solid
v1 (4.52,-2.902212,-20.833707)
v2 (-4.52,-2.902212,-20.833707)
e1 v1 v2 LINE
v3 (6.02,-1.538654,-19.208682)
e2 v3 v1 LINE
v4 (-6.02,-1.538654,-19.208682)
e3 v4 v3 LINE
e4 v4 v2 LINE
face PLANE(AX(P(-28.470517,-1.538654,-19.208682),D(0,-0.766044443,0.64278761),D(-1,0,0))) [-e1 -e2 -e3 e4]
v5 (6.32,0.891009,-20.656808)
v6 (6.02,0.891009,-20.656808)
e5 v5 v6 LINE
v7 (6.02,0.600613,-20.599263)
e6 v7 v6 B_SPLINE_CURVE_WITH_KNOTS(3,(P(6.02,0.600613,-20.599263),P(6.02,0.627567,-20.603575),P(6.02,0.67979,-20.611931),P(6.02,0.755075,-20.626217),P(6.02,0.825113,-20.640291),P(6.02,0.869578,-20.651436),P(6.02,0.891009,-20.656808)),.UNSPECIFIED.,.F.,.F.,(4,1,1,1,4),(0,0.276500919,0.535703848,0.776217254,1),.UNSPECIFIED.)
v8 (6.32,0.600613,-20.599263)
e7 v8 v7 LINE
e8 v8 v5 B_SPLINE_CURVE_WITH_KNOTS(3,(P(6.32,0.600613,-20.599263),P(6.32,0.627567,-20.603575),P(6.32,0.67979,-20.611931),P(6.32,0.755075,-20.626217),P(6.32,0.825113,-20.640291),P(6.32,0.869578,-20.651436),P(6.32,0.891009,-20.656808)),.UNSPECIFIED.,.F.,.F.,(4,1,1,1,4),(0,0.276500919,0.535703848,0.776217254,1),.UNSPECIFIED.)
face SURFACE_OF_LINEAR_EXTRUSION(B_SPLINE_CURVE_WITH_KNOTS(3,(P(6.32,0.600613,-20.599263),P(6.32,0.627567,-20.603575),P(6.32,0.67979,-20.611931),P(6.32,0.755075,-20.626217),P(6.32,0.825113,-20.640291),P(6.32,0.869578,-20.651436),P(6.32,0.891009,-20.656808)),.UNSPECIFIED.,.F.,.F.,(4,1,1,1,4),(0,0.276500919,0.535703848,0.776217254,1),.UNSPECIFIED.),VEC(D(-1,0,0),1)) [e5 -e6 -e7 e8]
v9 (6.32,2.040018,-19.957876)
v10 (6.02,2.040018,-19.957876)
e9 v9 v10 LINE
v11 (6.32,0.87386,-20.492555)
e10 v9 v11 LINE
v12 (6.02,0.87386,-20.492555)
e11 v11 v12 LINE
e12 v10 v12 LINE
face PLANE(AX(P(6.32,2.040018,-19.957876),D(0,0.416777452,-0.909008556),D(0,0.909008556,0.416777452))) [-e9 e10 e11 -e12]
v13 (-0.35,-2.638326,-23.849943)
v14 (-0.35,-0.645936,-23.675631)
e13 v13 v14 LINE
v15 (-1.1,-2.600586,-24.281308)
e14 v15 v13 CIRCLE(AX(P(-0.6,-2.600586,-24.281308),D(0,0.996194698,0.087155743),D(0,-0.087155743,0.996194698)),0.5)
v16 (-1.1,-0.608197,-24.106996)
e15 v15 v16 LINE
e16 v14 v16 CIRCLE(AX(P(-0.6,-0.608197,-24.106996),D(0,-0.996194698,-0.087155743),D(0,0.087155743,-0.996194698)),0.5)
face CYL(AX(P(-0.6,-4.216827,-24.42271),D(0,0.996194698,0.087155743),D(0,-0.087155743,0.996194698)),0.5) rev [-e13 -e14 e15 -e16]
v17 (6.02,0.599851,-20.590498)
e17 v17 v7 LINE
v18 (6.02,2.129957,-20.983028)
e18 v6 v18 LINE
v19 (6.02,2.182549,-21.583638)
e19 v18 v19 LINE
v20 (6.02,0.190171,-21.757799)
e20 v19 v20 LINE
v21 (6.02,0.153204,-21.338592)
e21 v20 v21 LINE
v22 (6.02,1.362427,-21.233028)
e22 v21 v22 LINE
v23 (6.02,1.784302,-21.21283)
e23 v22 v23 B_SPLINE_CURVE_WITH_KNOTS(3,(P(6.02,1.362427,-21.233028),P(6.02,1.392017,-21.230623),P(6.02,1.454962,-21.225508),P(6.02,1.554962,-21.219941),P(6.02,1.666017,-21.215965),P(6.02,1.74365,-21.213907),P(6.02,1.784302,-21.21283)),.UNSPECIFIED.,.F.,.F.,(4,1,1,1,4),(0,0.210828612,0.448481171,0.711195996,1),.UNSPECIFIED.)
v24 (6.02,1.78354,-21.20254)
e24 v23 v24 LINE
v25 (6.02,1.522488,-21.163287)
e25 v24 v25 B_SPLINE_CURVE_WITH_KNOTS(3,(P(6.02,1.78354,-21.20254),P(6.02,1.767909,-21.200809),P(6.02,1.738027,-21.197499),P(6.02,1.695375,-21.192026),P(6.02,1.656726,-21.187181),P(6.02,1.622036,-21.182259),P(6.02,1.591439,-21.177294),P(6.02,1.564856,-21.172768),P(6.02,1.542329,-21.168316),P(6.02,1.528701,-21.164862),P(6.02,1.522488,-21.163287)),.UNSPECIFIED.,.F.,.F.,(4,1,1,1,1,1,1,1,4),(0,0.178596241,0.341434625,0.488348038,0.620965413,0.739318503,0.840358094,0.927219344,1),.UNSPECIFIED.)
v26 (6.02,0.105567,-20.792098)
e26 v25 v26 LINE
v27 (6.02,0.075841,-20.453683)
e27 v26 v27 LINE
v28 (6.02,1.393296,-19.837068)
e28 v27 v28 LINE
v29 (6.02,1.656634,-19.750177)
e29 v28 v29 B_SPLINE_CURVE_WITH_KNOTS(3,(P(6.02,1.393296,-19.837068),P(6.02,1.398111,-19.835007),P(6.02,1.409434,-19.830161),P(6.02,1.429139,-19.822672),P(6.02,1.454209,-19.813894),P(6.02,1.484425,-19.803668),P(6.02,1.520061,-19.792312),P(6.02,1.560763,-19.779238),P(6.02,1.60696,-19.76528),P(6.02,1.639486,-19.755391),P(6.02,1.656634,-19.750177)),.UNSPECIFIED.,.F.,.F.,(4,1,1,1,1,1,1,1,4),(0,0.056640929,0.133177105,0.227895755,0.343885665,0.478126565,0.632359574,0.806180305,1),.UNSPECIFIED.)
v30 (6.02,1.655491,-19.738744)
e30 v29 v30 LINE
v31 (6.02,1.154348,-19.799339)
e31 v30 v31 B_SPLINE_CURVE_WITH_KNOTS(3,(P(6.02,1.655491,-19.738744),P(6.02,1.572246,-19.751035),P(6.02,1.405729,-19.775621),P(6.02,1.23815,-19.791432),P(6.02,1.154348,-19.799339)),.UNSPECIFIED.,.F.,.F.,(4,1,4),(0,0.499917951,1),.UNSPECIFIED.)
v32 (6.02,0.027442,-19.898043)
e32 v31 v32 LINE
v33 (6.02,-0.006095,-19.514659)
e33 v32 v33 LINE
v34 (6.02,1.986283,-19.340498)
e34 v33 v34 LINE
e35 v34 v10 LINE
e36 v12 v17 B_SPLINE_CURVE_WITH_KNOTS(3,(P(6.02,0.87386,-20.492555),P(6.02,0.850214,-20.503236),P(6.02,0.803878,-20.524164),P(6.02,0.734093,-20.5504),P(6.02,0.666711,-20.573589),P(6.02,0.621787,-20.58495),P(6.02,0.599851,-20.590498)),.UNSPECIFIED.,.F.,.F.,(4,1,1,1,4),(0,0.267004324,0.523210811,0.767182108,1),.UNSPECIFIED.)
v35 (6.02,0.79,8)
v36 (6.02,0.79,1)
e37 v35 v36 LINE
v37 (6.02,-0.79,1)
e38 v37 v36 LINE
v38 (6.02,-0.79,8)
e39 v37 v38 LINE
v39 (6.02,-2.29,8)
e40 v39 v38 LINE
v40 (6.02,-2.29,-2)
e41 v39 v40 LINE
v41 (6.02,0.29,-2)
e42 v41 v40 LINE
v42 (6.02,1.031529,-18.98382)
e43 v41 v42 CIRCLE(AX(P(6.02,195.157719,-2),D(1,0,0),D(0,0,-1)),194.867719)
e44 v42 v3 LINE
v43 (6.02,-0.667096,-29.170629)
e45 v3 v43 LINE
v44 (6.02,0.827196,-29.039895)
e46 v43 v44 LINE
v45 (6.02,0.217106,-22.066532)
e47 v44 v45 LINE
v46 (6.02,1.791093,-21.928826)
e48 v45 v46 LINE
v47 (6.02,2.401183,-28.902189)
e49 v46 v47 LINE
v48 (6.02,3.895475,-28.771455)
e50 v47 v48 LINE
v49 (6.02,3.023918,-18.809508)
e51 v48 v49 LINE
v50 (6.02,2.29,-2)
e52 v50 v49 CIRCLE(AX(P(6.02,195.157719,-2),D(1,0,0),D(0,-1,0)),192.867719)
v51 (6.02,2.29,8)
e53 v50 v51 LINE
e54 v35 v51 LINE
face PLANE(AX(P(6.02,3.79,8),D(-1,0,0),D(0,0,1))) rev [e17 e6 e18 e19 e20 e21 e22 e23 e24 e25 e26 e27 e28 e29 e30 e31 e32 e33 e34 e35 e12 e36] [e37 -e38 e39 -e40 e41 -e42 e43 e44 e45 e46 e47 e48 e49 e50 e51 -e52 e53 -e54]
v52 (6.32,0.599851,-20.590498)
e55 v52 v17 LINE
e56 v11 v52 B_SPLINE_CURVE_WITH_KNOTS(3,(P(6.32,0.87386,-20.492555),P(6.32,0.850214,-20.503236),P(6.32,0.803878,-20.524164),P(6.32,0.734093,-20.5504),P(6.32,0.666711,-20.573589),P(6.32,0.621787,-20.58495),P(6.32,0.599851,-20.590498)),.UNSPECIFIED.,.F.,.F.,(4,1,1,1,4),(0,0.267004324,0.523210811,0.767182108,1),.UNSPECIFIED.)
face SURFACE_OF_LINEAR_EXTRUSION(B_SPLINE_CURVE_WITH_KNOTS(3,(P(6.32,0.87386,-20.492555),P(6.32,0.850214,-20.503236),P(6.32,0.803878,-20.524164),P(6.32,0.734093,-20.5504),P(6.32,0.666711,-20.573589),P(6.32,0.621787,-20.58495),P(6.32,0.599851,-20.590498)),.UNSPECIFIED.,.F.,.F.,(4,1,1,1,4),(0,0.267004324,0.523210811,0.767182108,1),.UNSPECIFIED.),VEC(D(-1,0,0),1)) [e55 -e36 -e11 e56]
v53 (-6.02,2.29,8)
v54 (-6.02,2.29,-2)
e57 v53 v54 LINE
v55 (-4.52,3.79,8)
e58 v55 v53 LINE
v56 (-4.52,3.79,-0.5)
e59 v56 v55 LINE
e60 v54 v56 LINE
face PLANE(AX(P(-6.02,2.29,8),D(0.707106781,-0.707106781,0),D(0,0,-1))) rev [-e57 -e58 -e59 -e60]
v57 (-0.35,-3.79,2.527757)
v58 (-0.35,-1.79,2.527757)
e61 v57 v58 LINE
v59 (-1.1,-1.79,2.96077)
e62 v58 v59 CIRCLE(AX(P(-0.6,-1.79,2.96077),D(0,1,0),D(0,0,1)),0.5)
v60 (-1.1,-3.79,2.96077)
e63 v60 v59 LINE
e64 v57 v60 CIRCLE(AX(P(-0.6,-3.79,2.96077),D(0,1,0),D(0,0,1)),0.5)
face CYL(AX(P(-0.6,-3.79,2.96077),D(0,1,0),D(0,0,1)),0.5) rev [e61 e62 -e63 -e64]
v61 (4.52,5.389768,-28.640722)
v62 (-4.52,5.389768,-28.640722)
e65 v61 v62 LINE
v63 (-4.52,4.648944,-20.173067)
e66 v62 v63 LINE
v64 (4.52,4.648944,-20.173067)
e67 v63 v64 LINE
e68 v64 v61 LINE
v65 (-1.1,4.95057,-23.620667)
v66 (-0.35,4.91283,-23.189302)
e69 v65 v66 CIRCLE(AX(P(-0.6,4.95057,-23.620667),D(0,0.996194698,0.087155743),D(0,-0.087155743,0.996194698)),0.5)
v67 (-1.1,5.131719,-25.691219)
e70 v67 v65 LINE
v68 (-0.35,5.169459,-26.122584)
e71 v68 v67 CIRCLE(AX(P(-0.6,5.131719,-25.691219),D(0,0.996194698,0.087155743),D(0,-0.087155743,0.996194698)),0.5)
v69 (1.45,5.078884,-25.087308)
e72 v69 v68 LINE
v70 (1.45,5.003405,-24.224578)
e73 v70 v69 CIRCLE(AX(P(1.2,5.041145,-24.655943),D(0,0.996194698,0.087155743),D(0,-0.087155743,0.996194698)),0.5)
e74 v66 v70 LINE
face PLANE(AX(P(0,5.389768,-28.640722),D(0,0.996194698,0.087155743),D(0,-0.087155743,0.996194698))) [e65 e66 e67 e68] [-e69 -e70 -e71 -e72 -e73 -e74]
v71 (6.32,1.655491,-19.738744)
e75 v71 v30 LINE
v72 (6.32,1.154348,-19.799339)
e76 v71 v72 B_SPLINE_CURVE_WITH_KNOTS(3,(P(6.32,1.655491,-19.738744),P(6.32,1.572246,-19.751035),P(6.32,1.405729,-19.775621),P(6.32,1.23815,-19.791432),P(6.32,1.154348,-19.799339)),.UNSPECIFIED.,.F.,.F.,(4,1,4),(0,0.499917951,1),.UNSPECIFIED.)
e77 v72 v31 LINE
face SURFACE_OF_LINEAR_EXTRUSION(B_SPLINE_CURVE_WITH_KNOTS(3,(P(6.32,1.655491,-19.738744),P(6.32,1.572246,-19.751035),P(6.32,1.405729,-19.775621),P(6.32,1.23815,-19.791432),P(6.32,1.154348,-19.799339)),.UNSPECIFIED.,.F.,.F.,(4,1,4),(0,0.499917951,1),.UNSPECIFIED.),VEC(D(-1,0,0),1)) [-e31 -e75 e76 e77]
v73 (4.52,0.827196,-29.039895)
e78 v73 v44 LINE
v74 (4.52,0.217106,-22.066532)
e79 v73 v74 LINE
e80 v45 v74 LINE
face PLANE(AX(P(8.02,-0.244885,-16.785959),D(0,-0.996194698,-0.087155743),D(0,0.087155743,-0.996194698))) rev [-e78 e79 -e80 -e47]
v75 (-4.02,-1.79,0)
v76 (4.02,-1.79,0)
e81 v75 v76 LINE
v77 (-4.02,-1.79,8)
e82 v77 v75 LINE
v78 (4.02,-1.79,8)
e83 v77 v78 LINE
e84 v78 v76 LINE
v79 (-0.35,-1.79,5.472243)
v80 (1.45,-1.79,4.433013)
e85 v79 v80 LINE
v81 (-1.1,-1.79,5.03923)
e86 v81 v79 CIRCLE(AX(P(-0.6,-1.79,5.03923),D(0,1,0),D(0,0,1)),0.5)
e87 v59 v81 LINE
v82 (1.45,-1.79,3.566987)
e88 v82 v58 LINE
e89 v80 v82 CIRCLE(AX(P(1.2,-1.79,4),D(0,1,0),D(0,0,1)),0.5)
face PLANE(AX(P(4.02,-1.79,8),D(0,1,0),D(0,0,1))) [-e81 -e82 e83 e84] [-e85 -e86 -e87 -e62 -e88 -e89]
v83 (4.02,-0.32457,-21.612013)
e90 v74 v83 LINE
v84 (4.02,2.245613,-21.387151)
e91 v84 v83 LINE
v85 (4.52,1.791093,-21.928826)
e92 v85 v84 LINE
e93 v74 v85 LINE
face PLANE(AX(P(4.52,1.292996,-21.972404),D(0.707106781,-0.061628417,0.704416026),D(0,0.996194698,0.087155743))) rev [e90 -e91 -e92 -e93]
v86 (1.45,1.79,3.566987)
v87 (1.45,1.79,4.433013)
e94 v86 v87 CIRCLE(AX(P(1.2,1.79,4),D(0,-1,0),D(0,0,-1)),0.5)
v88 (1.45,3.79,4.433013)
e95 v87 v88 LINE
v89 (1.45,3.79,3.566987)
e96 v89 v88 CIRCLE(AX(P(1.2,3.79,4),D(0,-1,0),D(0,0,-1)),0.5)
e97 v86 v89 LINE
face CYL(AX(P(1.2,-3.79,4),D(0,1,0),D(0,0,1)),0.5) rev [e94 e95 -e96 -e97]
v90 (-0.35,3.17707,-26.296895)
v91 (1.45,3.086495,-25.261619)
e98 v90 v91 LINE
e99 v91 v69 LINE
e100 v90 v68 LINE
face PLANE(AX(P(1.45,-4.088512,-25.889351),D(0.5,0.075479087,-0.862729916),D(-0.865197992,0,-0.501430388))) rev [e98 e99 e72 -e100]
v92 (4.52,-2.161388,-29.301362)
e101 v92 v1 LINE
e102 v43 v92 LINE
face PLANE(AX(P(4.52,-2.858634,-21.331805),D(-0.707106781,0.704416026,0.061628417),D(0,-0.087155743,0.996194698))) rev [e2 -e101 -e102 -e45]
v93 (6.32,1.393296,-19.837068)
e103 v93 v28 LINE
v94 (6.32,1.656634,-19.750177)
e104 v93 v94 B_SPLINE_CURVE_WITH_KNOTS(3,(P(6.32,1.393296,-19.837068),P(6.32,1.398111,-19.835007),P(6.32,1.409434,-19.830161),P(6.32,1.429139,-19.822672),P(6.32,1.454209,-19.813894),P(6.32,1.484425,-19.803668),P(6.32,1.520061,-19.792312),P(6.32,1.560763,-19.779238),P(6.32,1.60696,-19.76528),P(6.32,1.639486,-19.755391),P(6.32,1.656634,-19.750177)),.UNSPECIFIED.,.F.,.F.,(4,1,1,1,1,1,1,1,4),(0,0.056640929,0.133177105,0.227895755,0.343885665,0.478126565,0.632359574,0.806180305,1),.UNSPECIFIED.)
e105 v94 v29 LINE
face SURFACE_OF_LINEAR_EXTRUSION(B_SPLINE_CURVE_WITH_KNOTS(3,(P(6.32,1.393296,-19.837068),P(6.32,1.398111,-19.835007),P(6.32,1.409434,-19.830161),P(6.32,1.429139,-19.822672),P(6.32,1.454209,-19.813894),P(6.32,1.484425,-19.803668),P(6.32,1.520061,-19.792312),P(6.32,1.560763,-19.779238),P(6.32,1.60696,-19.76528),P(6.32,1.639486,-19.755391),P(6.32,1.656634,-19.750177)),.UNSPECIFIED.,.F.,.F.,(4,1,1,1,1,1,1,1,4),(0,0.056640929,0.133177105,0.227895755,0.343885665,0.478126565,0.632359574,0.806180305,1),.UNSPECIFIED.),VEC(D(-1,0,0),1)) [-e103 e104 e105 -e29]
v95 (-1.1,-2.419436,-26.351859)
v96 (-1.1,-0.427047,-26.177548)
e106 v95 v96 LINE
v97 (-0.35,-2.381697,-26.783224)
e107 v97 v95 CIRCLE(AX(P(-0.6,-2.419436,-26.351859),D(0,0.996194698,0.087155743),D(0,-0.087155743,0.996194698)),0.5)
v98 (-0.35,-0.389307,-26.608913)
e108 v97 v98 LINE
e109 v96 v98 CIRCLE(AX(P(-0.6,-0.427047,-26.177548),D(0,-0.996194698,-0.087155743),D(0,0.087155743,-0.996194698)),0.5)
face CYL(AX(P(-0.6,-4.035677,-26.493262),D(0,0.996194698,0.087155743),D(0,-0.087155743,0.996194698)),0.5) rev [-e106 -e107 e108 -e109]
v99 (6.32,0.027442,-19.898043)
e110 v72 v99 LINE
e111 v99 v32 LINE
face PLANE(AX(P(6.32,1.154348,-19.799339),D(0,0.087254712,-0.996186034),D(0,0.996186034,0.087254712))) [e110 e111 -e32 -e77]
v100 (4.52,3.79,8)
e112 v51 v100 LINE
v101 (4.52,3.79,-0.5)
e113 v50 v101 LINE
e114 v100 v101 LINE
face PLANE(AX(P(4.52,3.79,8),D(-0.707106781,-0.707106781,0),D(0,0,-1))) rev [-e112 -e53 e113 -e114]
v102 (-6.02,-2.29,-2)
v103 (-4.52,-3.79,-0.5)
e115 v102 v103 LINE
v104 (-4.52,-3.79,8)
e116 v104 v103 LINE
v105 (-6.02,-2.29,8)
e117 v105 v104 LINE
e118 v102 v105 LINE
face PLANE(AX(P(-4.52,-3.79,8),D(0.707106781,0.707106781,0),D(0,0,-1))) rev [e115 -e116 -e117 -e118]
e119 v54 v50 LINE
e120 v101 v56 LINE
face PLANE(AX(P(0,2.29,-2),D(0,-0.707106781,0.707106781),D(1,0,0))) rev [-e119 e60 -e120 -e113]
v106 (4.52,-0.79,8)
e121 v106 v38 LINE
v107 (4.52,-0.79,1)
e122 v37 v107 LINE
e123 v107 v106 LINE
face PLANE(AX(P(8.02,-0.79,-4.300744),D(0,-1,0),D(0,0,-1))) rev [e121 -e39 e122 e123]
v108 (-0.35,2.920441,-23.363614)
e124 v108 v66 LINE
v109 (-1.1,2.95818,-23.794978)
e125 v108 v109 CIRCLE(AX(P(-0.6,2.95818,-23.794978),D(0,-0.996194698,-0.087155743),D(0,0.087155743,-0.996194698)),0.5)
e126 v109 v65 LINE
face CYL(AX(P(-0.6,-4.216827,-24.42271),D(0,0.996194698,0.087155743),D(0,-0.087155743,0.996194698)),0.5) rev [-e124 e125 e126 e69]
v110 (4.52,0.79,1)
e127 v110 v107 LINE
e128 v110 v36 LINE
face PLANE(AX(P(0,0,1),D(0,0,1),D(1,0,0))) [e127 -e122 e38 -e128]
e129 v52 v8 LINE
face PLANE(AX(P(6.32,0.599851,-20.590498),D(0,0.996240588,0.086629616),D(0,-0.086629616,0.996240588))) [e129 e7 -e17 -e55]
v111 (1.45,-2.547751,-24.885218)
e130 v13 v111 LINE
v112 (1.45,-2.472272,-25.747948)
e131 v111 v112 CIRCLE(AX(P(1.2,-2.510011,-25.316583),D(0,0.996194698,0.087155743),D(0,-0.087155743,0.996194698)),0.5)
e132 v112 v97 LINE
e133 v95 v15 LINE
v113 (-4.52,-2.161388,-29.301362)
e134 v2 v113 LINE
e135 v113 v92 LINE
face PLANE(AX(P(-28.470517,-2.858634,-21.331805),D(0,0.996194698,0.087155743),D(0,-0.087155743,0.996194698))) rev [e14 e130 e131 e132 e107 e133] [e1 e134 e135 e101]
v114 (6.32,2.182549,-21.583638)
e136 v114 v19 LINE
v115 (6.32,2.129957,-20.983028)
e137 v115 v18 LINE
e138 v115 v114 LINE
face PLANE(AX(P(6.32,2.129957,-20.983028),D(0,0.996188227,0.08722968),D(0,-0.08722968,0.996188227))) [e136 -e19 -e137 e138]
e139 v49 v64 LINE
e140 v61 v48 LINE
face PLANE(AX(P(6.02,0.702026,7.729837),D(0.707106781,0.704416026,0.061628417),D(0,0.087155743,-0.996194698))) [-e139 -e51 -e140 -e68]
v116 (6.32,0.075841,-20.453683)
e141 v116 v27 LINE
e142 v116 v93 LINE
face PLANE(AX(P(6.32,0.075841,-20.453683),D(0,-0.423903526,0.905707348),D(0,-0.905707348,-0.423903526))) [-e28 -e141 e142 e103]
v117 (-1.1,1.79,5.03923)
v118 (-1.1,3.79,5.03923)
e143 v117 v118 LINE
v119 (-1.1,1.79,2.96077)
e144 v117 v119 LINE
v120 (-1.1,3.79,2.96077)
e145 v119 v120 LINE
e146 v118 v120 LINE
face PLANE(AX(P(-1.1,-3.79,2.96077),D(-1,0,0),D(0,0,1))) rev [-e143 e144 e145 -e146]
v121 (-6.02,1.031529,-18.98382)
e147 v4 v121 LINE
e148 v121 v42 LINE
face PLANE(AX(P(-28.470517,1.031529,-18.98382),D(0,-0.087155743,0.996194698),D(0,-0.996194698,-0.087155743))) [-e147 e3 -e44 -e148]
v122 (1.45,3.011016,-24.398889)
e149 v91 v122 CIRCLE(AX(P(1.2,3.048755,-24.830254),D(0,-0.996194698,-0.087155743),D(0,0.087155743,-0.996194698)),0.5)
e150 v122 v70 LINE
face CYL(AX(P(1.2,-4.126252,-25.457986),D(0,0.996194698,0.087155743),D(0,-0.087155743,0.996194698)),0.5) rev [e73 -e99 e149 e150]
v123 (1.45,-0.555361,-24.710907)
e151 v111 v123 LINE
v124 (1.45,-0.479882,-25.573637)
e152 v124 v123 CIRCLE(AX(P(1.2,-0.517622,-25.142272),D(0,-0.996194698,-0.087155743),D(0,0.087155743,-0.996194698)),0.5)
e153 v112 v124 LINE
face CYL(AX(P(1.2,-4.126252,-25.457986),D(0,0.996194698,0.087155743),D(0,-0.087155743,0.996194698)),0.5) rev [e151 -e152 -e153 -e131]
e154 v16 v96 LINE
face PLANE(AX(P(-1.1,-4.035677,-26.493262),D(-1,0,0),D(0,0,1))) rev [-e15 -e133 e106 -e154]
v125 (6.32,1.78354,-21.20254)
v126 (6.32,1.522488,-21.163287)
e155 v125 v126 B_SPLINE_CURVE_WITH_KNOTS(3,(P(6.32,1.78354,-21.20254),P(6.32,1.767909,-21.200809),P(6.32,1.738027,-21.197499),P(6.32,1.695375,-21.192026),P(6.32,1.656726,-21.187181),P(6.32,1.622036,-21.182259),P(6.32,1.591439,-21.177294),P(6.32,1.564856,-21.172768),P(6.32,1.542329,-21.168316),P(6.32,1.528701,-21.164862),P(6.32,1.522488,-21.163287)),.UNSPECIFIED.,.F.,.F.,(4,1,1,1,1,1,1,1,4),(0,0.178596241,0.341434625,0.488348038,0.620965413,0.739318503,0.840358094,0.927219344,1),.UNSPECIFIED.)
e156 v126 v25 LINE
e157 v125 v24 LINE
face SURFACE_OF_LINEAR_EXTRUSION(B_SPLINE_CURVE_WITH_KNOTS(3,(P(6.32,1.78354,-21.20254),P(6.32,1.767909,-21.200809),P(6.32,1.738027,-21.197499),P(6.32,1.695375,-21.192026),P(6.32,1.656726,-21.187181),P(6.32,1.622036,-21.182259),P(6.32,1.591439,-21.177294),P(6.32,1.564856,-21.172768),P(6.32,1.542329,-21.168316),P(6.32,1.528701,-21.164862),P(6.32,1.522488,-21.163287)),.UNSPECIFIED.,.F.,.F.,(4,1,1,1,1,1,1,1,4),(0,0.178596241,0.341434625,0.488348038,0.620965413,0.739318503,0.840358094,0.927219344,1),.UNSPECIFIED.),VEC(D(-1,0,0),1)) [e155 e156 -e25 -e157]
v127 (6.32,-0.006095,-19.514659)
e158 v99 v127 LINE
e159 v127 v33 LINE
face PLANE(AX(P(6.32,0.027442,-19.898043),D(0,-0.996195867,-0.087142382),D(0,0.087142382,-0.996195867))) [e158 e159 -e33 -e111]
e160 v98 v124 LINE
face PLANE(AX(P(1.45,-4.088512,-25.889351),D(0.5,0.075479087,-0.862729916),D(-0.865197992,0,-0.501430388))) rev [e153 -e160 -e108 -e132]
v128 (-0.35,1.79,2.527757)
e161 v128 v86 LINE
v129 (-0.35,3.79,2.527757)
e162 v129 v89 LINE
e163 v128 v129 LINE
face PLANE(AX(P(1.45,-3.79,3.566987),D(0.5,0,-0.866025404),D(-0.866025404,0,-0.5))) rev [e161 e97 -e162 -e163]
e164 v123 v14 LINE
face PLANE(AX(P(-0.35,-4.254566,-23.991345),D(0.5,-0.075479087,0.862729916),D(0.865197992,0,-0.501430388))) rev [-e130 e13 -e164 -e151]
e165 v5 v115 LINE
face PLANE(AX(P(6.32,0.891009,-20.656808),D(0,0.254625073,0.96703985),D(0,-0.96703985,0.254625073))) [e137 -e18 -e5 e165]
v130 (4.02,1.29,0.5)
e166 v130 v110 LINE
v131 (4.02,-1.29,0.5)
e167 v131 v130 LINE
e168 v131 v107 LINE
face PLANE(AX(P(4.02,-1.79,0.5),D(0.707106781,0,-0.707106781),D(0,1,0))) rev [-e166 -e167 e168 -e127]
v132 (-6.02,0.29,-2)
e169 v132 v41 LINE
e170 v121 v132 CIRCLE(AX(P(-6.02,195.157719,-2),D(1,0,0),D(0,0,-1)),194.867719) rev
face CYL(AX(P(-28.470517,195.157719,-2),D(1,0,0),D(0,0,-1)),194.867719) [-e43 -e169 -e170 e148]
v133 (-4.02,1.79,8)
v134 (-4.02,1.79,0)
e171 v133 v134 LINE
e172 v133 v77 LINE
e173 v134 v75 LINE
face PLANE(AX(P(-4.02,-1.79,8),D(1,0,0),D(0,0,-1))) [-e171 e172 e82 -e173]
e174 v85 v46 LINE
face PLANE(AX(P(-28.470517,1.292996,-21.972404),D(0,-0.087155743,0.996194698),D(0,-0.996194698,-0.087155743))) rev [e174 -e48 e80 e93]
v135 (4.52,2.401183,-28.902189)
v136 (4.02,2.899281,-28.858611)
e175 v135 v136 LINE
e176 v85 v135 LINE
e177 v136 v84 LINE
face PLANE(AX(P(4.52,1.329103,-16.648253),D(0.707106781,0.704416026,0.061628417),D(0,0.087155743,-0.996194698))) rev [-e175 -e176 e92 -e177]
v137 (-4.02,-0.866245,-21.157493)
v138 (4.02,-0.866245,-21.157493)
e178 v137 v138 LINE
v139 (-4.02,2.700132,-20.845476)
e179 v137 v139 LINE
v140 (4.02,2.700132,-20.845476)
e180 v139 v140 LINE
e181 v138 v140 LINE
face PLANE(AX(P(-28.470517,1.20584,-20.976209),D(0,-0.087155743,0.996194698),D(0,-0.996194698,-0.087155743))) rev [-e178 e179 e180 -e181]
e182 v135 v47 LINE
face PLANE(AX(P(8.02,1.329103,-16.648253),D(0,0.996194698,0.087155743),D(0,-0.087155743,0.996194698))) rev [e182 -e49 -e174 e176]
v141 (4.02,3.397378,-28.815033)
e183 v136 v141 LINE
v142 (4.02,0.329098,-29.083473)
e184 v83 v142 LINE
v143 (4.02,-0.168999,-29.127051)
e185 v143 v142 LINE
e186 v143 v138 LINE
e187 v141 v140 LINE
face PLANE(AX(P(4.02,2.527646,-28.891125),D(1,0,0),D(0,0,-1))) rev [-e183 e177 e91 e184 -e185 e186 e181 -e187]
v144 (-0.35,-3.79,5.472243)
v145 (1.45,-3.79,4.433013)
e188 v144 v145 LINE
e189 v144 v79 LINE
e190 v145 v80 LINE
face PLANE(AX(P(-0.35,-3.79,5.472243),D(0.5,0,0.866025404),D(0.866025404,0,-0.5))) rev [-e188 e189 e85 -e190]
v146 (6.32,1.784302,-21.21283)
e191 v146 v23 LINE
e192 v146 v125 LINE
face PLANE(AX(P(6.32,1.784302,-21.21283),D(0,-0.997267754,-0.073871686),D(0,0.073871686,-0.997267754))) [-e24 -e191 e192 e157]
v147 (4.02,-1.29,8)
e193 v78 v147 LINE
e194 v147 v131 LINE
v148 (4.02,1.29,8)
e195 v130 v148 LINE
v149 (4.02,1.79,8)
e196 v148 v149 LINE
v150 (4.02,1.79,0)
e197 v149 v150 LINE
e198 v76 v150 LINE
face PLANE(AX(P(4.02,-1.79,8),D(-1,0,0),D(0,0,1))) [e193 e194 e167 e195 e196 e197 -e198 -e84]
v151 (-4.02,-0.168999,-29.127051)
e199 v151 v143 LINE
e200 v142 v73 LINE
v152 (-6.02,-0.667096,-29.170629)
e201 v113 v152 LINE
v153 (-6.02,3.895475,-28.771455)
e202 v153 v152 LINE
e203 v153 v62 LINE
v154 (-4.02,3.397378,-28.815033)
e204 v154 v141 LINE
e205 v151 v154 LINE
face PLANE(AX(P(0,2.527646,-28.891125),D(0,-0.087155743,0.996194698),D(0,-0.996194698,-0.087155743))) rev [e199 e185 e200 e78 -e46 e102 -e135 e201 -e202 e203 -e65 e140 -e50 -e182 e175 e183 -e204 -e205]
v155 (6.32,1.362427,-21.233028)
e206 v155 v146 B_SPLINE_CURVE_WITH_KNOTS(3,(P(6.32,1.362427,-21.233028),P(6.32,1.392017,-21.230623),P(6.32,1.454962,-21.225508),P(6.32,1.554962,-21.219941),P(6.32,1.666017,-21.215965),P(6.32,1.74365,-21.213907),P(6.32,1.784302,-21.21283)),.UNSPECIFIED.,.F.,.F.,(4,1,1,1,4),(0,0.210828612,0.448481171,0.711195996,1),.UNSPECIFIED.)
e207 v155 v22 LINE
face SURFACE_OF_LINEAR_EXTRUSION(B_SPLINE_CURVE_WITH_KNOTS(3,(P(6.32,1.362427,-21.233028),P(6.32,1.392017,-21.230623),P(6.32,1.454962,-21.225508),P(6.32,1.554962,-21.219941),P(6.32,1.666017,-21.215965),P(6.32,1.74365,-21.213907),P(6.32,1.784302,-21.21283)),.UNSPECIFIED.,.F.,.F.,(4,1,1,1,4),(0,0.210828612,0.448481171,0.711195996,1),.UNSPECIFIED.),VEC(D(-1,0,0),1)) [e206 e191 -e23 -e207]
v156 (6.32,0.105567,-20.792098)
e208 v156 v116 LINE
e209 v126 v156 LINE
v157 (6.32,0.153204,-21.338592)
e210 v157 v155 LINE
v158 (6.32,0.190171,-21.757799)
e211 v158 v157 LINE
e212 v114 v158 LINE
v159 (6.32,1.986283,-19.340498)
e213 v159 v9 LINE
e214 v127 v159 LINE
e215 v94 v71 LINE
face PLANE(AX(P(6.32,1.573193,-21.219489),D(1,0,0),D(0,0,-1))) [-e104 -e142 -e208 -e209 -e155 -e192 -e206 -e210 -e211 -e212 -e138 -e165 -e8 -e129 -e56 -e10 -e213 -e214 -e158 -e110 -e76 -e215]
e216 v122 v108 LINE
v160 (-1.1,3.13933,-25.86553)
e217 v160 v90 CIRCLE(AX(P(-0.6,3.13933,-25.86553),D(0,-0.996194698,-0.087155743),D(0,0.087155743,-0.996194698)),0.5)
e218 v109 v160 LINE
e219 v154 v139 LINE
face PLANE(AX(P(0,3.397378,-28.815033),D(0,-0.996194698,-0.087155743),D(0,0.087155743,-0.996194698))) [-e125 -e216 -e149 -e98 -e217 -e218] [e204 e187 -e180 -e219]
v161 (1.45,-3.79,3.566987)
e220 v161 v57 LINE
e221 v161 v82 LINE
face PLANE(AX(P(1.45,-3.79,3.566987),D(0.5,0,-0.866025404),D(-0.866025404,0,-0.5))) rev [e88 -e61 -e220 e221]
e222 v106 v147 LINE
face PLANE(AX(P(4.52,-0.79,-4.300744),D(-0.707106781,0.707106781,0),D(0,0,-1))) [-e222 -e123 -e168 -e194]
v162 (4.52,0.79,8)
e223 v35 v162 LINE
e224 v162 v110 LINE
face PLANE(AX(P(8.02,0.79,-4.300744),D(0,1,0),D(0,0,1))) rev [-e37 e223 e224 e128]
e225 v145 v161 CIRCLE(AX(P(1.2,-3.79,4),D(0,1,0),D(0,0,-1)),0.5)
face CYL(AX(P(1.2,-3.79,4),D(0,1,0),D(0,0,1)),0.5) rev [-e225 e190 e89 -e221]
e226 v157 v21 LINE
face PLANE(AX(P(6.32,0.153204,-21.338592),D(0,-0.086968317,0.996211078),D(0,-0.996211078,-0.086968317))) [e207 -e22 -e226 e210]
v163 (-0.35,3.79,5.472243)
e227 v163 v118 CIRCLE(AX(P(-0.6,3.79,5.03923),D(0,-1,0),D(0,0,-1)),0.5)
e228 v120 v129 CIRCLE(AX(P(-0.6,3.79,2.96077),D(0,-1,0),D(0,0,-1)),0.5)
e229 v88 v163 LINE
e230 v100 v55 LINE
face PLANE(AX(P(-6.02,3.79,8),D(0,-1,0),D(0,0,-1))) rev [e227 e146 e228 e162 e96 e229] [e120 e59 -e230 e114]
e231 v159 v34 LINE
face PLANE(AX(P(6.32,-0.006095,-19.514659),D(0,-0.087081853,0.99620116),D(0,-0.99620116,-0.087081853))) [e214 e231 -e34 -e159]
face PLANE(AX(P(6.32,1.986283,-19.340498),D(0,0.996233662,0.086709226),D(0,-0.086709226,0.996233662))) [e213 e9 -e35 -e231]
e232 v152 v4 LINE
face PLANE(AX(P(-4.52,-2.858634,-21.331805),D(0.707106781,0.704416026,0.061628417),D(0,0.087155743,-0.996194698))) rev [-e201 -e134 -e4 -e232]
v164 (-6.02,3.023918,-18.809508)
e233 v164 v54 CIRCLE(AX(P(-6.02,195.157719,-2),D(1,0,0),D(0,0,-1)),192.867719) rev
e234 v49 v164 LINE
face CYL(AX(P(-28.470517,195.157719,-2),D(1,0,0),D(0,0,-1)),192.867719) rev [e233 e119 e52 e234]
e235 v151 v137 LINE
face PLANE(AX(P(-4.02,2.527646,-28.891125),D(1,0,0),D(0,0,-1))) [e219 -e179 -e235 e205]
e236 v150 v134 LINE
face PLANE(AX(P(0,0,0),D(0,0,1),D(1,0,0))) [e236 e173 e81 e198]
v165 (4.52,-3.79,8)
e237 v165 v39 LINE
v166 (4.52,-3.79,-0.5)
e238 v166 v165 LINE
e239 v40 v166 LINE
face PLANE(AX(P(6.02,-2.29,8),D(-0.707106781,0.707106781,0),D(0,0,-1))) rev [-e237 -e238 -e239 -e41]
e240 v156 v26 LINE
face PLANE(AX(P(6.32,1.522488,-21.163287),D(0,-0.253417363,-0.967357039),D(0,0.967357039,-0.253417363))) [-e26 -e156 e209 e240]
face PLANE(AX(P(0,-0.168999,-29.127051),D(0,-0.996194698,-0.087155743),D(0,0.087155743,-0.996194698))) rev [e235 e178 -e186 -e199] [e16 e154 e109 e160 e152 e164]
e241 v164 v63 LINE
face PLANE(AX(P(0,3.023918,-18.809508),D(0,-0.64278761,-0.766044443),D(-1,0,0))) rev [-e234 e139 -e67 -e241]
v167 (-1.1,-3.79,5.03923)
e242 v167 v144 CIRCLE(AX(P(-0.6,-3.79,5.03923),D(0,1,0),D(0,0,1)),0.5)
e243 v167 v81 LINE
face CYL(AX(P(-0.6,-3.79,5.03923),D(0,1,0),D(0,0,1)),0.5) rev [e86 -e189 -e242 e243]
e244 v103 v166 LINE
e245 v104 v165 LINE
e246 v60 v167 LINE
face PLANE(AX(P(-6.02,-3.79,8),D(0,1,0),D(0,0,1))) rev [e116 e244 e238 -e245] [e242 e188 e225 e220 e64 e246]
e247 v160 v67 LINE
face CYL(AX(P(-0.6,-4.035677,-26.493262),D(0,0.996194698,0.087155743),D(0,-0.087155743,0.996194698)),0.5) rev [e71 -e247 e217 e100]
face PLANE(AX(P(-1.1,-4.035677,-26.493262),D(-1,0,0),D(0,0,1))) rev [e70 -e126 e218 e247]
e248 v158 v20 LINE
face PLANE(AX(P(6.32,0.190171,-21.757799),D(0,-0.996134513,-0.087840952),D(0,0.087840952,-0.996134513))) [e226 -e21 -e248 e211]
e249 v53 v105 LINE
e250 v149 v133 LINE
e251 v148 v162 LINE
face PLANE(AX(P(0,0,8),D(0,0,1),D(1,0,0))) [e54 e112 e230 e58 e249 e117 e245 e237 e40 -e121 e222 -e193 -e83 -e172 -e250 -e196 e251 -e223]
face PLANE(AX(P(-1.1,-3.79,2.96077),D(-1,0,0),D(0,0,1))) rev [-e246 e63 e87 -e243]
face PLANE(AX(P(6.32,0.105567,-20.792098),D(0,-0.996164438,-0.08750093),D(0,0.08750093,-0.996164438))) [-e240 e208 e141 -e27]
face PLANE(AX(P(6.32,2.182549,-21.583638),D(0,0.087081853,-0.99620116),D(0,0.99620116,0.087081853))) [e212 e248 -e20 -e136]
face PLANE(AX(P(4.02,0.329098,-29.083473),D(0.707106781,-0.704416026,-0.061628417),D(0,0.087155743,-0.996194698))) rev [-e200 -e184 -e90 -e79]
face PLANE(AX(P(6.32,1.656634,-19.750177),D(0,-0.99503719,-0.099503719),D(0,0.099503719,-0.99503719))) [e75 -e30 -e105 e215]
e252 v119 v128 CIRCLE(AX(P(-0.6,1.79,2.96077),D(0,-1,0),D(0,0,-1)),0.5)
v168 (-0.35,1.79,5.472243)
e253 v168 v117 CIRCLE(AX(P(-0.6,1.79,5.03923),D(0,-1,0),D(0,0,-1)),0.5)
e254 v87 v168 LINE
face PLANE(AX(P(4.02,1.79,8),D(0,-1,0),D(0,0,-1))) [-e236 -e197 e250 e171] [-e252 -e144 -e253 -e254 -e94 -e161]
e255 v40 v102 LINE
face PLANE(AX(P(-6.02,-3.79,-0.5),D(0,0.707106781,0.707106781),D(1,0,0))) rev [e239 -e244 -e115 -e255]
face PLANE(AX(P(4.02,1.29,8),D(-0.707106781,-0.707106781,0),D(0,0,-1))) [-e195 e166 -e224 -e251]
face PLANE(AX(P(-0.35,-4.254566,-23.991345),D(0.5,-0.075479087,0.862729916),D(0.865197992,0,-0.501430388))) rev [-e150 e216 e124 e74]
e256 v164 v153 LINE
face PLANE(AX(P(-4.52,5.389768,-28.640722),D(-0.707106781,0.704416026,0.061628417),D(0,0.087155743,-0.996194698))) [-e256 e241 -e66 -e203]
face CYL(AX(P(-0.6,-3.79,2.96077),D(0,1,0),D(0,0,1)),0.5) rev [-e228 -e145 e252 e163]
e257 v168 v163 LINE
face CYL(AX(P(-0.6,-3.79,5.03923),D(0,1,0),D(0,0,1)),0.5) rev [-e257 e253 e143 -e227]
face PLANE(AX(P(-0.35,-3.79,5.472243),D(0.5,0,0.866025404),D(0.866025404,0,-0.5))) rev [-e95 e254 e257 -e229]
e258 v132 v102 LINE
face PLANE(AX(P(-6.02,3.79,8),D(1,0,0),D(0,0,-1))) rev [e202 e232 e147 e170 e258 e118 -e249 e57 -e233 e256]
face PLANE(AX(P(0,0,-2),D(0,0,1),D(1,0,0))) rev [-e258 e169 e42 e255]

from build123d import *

# Parameters (mm, degrees)
SKETCH1_W               = 12.04
SKETCH1_H               = 7.58
SKETCH1_W_2             = 8.04
SKETCH1_H_2             = 3.58
BOSS_EXTRUDE1_DEPTH     = 8
SKETCH1_2_W             = 12.04
SKETCH1_2_H             = 7.58
SKETCH1_2_W_2           = 8.04
SKETCH1_2_H_2           = 3.58
BOSS_EXTRUDE2_DEPTH     = 2
EXTRUDE_THIN1_START     = -12.04
EXTRUDE_THIN1_DEPTH     = 12.04
SKETCH5_W               = 12.04
SKETCH5_H               = 7.58
SKETCH5_W_2             = 8.04
SKETCH5_H_2             = 3.58
BOSS_EXTRUDE4_DEPTH     = 10
SKETCH5_4_W             = 12.04
SKETCH5_4_H             = 7.58
BOSS_EXTRUDE5_DEPTH     = 2
CHAMFER1_SIZE           = 1.5
CUT_EXTRUDE1_DEPTH      = 31.858817668
CUT_EXTRUDE1_DEPTH_BACK = 31.858817668
CUT_EXTRUDE2_DEPTH      = 31.883619629
CUT_EXTRUDE2_DEPTH_BACK = 31.883619629
SKETCH8_W               = 4
SKETCH8_H               = 1.58
CUT_EXTRUDE3_DEPTH      = 7
SKETCH9_W               = 4
SKETCH9_H               = 1.58
CUT_EXTRUDE4_DEPTH      = 7
CHAMFER2_SIZE           = 0.5
BOSS_EXTRUDE6_DEPTH     = 0.3


with BuildPart() as part:
    # Sketch1 → Boss-Extrude1 (new body)
    with BuildSketch(Plane.XY):
        Rectangle(SKETCH1_W, SKETCH1_H)
        Rectangle(SKETCH1_W_2, SKETCH1_H_2, mode=Mode.SUBTRACT)
    extrude(amount=BOSS_EXTRUDE1_DEPTH)

    # Sketch1<2> → Boss-Extrude2 (add)
    # profile 1 of 2: a face of its own
    with BuildSketch(Plane.XY):
        Rectangle(SKETCH1_2_W, SKETCH1_2_H)
        Rectangle(SKETCH1_2_W_2, SKETCH1_2_H_2, mode=Mode.SUBTRACT)
    # profile 2 of 2: a face of its own
    with BuildSketch(Plane.XY):
        Rectangle(SKETCH1_2_W_2, SKETCH1_2_H_2)
    extrude(amount=-BOSS_EXTRUDE2_DEPTH)

    # Sketch3 → Extrude-Thin1 (add)
    with BuildSketch(Plane(origin=(6.02, 9.81, 0), x_dir=(0, -1, 0), z_dir=(1, 0, 0)).offset(EXTRUDE_THIN1_START)):
        with BuildLine():
            Line((13.6, 2), (9.52, 2))
            ThreePointArc((9.52, 2), (9.33452957, 10.5), (8.778471331, 18.983819807))
            Line((8.778471331, 18.983819807), (12.842945699, 19.339415237))
            Line((12.842945699, 19.339415237), (12.668634214, 21.331804633))
            Line((12.668634214, 21.331804633), (6.601440048, 20.800993925))
            ThreePointArc((6.601440048, 20.800993925), (7.336433126, 10.412761225), (7.509629919, 0))
            Line((7.509629919, 0), (13.6, 0))
            Line((13.6, 0), (13.6, 2))
        make_face()
    extrude(amount=EXTRUDE_THIN1_DEPTH)

    # Sketch5 → Boss-Extrude4 (add)
    with BuildSketch(Plane(origin=(0, -2.094837633, -19.257341416), x_dir=(-1, 0, 0), z_dir=(0, 0.08715574274765182, -0.9961946980917462))):
        with Locations((0, 2.848308513)):
            Rectangle(SKETCH5_W, SKETCH5_H)
        with Locations((0, 2.848308513)):
            Rectangle(SKETCH5_W_2, SKETCH5_H_2, mode=Mode.SUBTRACT)
    extrude(amount=BOSS_EXTRUDE4_DEPTH)

    # Sketch5<4> → Boss-Extrude5 (add)
    with BuildSketch(Plane(origin=(0, -2.094837633, -19.257341416), x_dir=(-1, 0, 0), z_dir=(0, 0.08715574274765182, -0.9961946980917462))):
        with Locations((0, 2.848308513)):
            Rectangle(SKETCH5_4_W, SKETCH5_4_H)
    extrude(amount=BOSS_EXTRUDE5_DEPTH)

    # Chamfer1
    chamfer1_edges = [part.edges().sort_by_distance(p)[0] for p in [
        (0, -3.79, -2),
        (0, 3.79, -2),
        (-6.02, -2.597166986, -24.320388728),
        (6.02, -2.597166986, -24.320388728),
        (0, -3.032945699, -19.339415237),
        (6.02, -3.79, 3),
        (-6.02, -3.79, 3),
        (-6.02, 3.79, 3),
        (6.02, 3.79, 3),
        (0, 4.518210112, -18.678774707),
        (6.02, 4.953988826, -23.659748198),
        (-6.02, 4.953988826, -23.659748198),
    ]]
    chamfer(chamfer1_edges, length=CHAMFER1_SIZE - 0.0001)  # a hair under: the kernel refuses the full size

    # Sketch6 → Cut-Extrude1 (cut, two sides: drawn at the far end of the back side and taken through both)
    with BuildSketch(Plane(origin=(0, 3.79, 0), x_dir=(1, 0, 0), z_dir=(0, 1, 0)).offset(-CUT_EXTRUDE1_DEPTH_BACK)):
        with BuildLine():
            Line((1.45, -3.566987298), (-0.35, -2.527756814))
            ThreePointArc((-0.35, -2.527756814), (-0.85, -2.527756814), (-1.1, -2.960769515))
            Line((-1.1, -2.960769515), (-1.1, -5.039230485))
            ThreePointArc((-1.1, -5.039230485), (-0.85, -5.472243186), (-0.35, -5.472243186))
            Line((-0.35, -5.472243186), (1.45, -4.433012702))
            ThreePointArc((1.45, -4.433012702), (1.7, -4), (1.45, -3.566987298))
        make_face()
    extrude(amount=CUT_EXTRUDE1_DEPTH + CUT_EXTRUDE1_DEPTH_BACK, mode=Mode.SUBTRACT)

    # Sketch7 → Cut-Extrude2 (cut, two sides: drawn at the far end of the back side and taken through both)
    with BuildSketch(Plane(origin=(0, 2.862121636, 0.250403197), x_dir=(1, 0, 0), z_dir=(0, 0.9961946980917462, 0.08715574274765181)).offset(-CUT_EXTRUDE2_DEPTH_BACK)):
        with BuildLine():
            Line((1.45, 25.43449699), (-0.35, 26.473727475))
            ThreePointArc((-0.35, 26.473727475), (-0.85, 26.473727475), (-1.1, 26.040714773))
            Line((-1.1, 26.040714773), (-1.1, 23.962253804))
            ThreePointArc((-1.1, 23.962253804), (-0.85, 23.529241102), (-0.35, 23.529241102))
            Line((-0.35, 23.529241102), (1.45, 24.568471587))
            ThreePointArc((1.45, 24.568471587), (1.7, 25.001484288), (1.45, 25.43449699))
        make_face()
    extrude(amount=CUT_EXTRUDE2_DEPTH + CUT_EXTRUDE2_DEPTH_BACK, mode=Mode.SUBTRACT)

    # Sketch8 → Cut-Extrude3 (cut)
    with BuildSketch(Plane(origin=(0, 2.527645904, -28.891124885), x_dir=(-1, 0, 0), z_dir=(0, 0.08715574274765193, -0.9961946980917461))):
        with Locations((-6.02, -0.916945525)):
            Rectangle(SKETCH8_W, SKETCH8_H)
    extrude(amount=-CUT_EXTRUDE3_DEPTH, mode=Mode.SUBTRACT)

    # Sketch9 → Cut-Extrude4 (cut)
    with BuildSketch(Plane.XY.offset(8)):
        with Locations((6.02, 0)):
            Rectangle(SKETCH9_W, SKETCH9_H)
    extrude(amount=-CUT_EXTRUDE4_DEPTH, mode=Mode.SUBTRACT)

    # Chamfer2
    chamfer2_edges = [part.edges().sort_by_distance(p)[0] for p in [
        (4.02, 0.522150723, -25.553213547),
        (4.02, 1.004099435, -21.997679067),
        (4.02, 2.096138346, -25.415507473),
        (4.02, 0.79, 4.5),
        (4.02, 0, 1),
        (4.02, -0.79, 4.5),
    ]]
    chamfer(chamfer2_edges, length=CHAMFER2_SIZE)

    # Sketch10 → Boss-Extrude6 (add)
    with BuildSketch(Plane(origin=(6.02, 0, 0), x_dir=(0, 0, -1), z_dir=(1, 0, 0))):
        with BuildLine():
            Line((21.338592032, 0.15320422), (21.233028007, 1.362426781))
            add(Edge.make_bspline(
                [(21.233028007, 1.362426781), (21.230623172, 1.392016851), (21.22550753, 1.454961769), (21.219940858, 1.554962176), (21.215964545, 1.666017285), (21.21390718, 1.743649504), (21.212829837, 1.784301781)],
                knots=[0, 0, 0, 0, 0.843314449, 1.793924683, 2.844783983, 4, 4, 4, 4], degree=3))
            Line((21.212829837, 1.784301781), (21.202540203, 1.783539585))
            add(Edge.make_bspline(
                [(21.202540203, 1.783539585), (21.200808847, 1.76790896), (21.197498896, 1.738026826), (21.192026096, 1.695375149), (21.187181442, 1.656725646), (21.182258815, 1.622035938), (21.177293915, 1.591439333), (21.172767869, 1.564856175), (21.168316369, 1.542328609), (21.164861999, 1.528700708), (21.163287154, 1.522487756)],
                knots=[0, 0, 0, 0, 1.428769924, 2.731477, 3.906784307, 4.967723303, 5.914548028, 6.722864751, 7.417754754, 8, 8, 8, 8], degree=3))
            Line((21.163287154, 1.522487756), (20.792098129, 0.105567024))
            Line((20.792098129, 0.105567024), (20.453683495, 0.075841415))
            Line((20.453683495, 0.075841415), (19.837067642, 1.393295683))
            add(Edge.make_bspline(
                [(19.837067642, 1.393295683), (19.835006874, 1.398111338), (19.83016149, 1.409434157), (19.822671636, 1.429138703), (19.813894021, 1.454208796), (19.803667873, 1.484424749), (19.792311733, 1.520061222), (19.779237689, 1.560762892), (19.765280196, 1.6069604), (19.755390982, 1.639486413), (19.750177398, 1.656634098)],
                knots=[0, 0, 0, 0, 0.453127431, 1.065416844, 1.823166036, 2.751085321, 3.825012516, 5.058876589, 6.449442438, 8, 8, 8, 8], degree=3))
            Line((19.750177398, 1.656634098), (19.738744471, 1.655490805))
            add(Edge.make_bspline(
                [(19.738744471, 1.655490805), (19.751035456, 1.572245864), (19.77562146, 1.405728657), (19.791432277, 1.238150394), (19.799338983, 1.154347512)],
                knots=[0, 0, 0, 0, 0.999835902, 2, 2, 2, 2], degree=3))
            Line((19.799338983, 1.154347512), (19.898043251, 0.027442024))
            Line((19.898043251, 0.027442024), (19.514659105, -0.006094561))
            Line((19.514659105, -0.006094561), (19.34049752, 1.986283488))
            Line((19.34049752, 1.986283488), (19.957875568, 2.040018244))
            Line((19.957875568, 2.040018244), (20.492555446, 0.873859707))
            add(Edge.make_bspline(
                [(20.492555446, 0.873859707), (20.503235644, 0.85021375), (20.524164125, 0.803878095), (20.550400132, 0.734093054), (20.573588848, 0.666711186), (20.584949885, 0.621787137), (20.59049752, 0.599850561)],
                knots=[0, 0, 0, 0, 1.068017297, 2.092843245, 3.068728431, 4, 4, 4, 4], degree=3))
            Line((20.59049752, 0.599850561), (20.599262764, 0.600612756))
            add(Edge.make_bspline(
                [(20.599262764, 0.600612756), (20.603575304, 0.627567148), (20.611930591, 0.679789657), (20.62621702, 0.755074943), (20.640290752, 0.825113193), (20.651436457, 0.869577883), (20.656808495, 0.891009098)],
                knots=[0, 0, 0, 0, 1.106003676, 2.142815394, 3.104869014, 4, 4, 4, 4], degree=3))
            Line((20.656808495, 0.891009098), (20.983028007, 2.129957268))
            Line((20.983028007, 2.129957268), (21.583637764, 2.182548732))
            Line((21.583637764, 2.182548732), (21.757799349, 0.190170683))
            Line((21.757799349, 0.190170683), (21.338592032, 0.15320422))
        make_face()
    extrude(amount=BOSS_EXTRUDE6_DEPTH)


solid = part.part
